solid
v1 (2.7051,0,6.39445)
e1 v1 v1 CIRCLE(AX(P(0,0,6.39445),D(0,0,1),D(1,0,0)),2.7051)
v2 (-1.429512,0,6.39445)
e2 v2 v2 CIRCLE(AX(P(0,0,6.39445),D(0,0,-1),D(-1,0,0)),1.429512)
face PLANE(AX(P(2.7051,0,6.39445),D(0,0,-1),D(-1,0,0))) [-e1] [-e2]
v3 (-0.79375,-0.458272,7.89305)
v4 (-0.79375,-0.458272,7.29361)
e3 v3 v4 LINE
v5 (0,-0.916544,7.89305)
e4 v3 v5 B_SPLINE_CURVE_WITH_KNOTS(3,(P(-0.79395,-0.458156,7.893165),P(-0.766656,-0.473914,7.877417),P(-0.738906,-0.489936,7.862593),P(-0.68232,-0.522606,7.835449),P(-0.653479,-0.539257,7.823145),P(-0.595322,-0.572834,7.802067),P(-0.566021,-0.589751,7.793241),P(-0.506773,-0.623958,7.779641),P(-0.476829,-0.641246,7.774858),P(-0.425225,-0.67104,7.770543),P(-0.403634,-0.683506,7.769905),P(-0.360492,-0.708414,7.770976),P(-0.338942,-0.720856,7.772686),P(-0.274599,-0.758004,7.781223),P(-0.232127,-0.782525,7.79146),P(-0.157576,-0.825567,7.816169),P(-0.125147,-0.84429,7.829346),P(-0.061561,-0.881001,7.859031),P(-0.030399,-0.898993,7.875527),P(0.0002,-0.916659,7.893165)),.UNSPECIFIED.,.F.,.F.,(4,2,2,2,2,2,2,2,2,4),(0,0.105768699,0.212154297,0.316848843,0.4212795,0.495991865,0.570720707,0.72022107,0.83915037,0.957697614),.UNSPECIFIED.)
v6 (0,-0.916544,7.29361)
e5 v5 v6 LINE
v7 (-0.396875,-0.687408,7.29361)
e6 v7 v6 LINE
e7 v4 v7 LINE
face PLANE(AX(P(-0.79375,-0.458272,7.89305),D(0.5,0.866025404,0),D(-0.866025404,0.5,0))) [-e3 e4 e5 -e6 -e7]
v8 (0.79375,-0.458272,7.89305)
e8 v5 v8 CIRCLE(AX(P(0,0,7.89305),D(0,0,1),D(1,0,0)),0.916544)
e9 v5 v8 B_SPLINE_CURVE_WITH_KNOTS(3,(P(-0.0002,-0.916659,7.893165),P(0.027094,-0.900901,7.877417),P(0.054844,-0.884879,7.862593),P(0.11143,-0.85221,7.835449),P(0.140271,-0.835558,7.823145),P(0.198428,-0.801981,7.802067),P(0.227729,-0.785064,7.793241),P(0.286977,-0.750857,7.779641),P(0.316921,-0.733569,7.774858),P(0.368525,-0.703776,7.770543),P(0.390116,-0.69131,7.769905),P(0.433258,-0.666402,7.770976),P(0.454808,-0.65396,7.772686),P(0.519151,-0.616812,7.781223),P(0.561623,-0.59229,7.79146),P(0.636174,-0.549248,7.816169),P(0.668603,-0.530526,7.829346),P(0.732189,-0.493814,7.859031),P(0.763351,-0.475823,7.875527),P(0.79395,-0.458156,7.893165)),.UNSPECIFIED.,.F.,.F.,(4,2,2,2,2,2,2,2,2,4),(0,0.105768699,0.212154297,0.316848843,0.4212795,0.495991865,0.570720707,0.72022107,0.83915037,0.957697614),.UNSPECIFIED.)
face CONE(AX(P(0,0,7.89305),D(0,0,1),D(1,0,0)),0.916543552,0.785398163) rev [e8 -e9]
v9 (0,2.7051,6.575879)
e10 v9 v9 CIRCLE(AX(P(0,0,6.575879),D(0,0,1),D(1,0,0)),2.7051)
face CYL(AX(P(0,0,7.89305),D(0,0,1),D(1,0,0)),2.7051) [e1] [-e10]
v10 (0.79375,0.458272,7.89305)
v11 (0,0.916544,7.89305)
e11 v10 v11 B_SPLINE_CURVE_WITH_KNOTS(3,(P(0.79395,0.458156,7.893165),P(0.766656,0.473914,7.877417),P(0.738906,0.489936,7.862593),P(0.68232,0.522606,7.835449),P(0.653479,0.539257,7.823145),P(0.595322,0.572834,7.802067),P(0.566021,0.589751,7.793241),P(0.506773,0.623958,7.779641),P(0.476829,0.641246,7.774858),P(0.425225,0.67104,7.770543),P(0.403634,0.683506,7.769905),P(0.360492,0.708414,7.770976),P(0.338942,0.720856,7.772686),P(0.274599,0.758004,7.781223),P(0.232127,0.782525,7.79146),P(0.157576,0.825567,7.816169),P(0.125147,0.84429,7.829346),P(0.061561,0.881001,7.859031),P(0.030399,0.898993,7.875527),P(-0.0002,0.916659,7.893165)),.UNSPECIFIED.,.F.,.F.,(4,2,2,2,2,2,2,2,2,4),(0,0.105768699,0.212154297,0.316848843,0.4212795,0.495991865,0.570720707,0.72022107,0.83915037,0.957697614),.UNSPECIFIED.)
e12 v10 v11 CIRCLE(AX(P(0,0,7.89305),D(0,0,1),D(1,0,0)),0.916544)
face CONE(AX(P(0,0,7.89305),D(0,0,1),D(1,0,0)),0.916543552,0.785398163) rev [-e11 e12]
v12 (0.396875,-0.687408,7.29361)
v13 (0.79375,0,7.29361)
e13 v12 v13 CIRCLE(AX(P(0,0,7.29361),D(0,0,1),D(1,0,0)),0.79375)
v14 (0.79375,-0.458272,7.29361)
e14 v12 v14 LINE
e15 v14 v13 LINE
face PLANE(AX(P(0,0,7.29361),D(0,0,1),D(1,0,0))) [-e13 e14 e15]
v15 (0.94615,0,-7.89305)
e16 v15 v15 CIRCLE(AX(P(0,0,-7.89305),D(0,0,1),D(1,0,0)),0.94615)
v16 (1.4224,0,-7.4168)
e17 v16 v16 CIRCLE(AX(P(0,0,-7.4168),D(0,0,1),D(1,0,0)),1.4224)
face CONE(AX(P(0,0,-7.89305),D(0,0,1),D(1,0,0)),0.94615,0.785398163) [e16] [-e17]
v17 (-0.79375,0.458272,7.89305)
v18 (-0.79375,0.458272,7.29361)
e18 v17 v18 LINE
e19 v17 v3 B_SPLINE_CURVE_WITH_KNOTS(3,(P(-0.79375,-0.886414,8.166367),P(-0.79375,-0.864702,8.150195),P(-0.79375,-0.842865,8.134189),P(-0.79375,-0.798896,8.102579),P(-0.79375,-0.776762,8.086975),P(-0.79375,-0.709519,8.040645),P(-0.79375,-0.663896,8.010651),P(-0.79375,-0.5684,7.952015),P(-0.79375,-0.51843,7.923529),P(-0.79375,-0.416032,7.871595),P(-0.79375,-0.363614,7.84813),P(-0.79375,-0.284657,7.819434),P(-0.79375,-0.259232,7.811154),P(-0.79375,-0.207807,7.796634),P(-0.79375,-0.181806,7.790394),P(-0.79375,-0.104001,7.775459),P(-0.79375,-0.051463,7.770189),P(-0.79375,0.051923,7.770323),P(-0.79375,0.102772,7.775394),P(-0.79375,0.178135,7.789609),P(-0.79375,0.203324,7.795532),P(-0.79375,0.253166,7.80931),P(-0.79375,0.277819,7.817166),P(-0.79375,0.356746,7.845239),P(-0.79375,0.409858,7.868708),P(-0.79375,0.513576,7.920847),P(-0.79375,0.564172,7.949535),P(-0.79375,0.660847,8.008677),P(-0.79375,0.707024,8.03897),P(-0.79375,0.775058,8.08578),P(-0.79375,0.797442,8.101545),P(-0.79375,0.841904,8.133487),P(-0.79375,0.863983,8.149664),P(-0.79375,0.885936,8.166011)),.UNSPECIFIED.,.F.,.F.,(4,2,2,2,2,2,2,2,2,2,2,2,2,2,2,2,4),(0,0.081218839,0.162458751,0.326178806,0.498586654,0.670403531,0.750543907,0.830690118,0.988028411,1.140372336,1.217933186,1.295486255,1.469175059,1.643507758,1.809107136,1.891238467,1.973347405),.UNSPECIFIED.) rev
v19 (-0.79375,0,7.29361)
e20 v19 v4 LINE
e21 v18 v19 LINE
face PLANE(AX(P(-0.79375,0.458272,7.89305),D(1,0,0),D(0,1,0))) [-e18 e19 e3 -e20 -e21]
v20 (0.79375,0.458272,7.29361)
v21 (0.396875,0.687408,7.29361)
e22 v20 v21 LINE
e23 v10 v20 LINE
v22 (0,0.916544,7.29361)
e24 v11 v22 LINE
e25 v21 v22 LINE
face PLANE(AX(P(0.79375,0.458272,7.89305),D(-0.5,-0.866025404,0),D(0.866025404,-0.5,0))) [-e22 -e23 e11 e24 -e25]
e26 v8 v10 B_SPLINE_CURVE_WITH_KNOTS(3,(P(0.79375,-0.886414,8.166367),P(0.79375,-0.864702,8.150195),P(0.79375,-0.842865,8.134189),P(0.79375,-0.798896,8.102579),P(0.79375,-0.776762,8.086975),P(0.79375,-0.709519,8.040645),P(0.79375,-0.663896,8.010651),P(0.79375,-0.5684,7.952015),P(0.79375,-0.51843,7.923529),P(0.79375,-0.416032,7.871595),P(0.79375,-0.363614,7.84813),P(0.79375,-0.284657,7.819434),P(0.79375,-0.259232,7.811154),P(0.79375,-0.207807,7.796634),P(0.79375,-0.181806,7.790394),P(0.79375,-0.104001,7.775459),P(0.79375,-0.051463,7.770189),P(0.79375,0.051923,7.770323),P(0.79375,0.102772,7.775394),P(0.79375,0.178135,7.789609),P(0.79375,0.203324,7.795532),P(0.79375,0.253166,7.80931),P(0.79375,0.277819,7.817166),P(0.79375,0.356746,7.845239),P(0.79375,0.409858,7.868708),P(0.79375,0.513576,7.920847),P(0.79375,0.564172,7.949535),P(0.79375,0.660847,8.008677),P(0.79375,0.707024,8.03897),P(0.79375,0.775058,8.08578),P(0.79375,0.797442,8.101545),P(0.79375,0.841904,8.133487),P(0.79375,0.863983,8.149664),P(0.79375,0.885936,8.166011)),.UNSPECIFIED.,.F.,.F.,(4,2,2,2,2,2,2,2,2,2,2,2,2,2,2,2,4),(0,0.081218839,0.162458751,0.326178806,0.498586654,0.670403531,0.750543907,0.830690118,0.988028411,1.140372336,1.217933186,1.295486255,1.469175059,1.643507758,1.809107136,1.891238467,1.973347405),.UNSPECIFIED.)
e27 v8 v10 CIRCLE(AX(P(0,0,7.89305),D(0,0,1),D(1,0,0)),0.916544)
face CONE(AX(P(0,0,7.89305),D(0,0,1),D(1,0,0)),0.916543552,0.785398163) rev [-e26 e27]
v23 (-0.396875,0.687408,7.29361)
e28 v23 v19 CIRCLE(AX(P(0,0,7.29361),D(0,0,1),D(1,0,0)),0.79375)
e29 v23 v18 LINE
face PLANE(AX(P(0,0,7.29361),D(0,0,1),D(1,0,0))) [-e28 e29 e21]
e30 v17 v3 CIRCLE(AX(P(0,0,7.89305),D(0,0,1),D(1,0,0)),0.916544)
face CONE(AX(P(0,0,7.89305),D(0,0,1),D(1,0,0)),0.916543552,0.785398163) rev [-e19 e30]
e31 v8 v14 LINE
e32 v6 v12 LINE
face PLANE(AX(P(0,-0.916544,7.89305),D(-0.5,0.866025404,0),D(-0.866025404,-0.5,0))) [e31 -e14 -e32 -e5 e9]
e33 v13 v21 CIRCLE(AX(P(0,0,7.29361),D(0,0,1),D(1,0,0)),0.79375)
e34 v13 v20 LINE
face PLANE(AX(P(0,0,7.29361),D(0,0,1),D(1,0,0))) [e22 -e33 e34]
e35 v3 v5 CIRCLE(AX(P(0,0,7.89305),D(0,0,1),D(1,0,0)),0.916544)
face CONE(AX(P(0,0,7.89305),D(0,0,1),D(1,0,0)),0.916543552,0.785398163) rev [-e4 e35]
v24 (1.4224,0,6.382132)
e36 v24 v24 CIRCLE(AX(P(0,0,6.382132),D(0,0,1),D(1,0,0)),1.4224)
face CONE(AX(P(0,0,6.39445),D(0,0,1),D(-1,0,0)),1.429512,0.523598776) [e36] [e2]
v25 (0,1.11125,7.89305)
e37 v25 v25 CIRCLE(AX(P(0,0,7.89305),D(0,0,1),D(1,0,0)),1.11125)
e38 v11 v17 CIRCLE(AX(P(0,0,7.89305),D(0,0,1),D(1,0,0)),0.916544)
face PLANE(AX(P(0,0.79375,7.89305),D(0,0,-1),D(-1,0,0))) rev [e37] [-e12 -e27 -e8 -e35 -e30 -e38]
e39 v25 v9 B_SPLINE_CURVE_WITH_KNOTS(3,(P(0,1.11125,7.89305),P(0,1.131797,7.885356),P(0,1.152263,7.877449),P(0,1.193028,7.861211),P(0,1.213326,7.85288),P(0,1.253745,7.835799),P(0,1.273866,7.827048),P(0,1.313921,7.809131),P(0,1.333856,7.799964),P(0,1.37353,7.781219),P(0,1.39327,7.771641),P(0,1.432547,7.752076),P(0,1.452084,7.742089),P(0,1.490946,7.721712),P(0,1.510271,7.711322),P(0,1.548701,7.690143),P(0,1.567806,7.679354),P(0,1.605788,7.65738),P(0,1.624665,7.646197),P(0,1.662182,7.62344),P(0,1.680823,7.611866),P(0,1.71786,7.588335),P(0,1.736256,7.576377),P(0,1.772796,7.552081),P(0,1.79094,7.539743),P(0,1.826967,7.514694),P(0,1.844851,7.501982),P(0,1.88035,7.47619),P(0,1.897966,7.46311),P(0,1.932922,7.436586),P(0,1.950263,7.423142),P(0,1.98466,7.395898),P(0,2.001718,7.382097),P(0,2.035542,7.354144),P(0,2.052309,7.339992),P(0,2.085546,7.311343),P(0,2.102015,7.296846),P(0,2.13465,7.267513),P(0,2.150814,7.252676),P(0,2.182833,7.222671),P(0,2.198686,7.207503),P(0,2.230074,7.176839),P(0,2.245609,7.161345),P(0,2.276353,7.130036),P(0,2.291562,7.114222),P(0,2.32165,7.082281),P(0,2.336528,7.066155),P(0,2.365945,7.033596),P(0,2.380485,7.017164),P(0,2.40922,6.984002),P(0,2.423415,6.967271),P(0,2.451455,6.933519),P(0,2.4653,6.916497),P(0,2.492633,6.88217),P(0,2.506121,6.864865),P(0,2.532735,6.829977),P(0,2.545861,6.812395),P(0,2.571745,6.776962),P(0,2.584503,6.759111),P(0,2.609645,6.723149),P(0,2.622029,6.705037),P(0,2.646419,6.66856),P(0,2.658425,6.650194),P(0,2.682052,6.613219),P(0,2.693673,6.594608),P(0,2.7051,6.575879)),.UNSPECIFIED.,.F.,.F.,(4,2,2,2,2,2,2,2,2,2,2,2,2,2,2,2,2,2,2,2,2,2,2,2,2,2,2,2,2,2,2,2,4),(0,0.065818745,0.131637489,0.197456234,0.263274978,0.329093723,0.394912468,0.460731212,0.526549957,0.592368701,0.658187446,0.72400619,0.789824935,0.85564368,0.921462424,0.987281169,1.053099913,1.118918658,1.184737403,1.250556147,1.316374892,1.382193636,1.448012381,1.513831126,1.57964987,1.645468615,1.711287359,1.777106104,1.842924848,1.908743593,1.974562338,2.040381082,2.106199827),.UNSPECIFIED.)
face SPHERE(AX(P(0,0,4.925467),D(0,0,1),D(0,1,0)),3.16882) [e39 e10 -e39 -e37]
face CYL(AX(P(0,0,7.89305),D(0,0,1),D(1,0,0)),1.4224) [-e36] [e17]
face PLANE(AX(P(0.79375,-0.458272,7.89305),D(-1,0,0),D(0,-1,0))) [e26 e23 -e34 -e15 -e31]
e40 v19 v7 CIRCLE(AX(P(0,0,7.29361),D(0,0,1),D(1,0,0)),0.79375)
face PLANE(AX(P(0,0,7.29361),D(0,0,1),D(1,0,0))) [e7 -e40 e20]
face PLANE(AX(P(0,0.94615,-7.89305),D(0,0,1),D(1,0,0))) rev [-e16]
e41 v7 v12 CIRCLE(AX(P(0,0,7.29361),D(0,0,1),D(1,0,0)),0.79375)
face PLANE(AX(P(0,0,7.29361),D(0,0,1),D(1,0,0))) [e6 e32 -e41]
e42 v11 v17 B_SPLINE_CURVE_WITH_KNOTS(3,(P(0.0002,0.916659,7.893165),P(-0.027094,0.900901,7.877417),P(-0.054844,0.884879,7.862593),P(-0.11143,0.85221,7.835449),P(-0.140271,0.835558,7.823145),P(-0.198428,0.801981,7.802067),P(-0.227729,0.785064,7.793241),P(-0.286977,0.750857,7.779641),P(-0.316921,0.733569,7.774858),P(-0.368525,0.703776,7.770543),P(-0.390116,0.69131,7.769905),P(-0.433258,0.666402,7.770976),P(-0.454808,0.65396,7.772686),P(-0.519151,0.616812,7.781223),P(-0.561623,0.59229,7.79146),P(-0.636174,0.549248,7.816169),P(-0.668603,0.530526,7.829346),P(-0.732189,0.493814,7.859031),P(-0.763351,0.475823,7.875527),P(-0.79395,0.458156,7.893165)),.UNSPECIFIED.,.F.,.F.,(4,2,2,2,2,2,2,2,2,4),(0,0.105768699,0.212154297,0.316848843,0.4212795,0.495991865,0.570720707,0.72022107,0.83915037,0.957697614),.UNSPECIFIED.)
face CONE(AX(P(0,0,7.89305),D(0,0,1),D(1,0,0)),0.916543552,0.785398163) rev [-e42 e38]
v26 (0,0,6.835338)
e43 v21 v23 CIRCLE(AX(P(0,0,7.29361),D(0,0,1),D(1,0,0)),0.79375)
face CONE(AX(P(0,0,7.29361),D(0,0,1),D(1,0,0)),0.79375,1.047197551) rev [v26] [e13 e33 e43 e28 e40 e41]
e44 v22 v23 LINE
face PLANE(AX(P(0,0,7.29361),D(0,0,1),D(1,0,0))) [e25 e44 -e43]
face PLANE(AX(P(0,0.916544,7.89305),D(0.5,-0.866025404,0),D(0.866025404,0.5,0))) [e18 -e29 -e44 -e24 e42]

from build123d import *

# Parameters (mm, degrees)
CUT_EXTRUDE1_START = 7.29361
CUT_EXTRUDE1_DEPTH = 2.477670997


# Read off the part's stored shape, not the designer's step: Split1
with BuildPart() as part:
    # Sketch2 → Revolve1 (revolve)
    with BuildSketch(Plane(origin=(0, 0, 0), x_dir=(0, 0, -1), z_dir=(1, 0, 0)), mode=Mode.PRIVATE) as revolve1_sk:
        with BuildLine():
            Line((-7.89305, 0.79375), (-7.89305, 1.11125))
            ThreePointArc((-7.89305, 1.11125), (-7.36812089, 2.018629974), (-6.575878571, 2.7051))
            Line((-6.575878571, 2.7051), (-6.39445, 2.7051))
            Line((-6.39445, 2.7051), (-6.39445, 1.4224))
            Line((-6.39445, 1.4224), (7.4168, 1.4224))
            Line((7.4168, 1.4224), (7.89305, 0.94615))
            Line((7.89305, 0.94615), (7.89305, 0))
            Line((7.89305, 0), (-6.835338224, 0))
            Line((-6.835338224, 0), (-7.29361, 0.79375))
            Line((-7.29361, 0.79375), (-7.89305, 0.79375))
        make_face()
    revolve(revolve1_sk.sketch.rotate(Axis((0, 0, 7.89305), (0, 0, -1)), 90), axis=Axis((0, 0, 7.89305), (0, 0, -1)))

    # Sketch3 → Cut-Extrude1 (cut, through all)
    with BuildSketch(Plane.XY.offset(CUT_EXTRUDE1_START)):
        Polygon((0, 0.916543552), (-0.79375, 0.458271776), (-0.79375, -0.458271776), (0, -0.916543552), (0.79375, -0.458271776), (0.79375, 0.458271776), align=None)
    extrude(amount=CUT_EXTRUDE1_DEPTH, mode=Mode.SUBTRACT)

    # Cut-Extrude2 cone 1 section (through the dimple's axis) → Cut-Extrude2 (revolve, cut)
    with BuildSketch(Plane(origin=(0, 0, 7.89305), x_dir=(0, -1, 0), z_dir=(1, 0, 0))):
        Polygon((0, 0), (0.916543552, 0), (0, 0.916543552), align=None)
    revolve(axis=Axis((0, 0, 7.89305), (0, 0, -1)), mode=Mode.SUBTRACT)


with BuildPart() as body_2:
    # Split1: the piece on the far side of the plane
    add(part.part)
    split(bisect_by=Plane.XY.offset(6.39445), keep=Keep.BOTTOM)


with BuildPart() as part_1:
    add(part.part)

    # Split1
    split(bisect_by=Plane.XY.offset(6.39445), keep=Keep.TOP)

    add(body_2.part)  # Boss-Extrude1 merges body 2
    # Boss-Extrude1 cone 1 section (through the dimple's axis) → Boss-Extrude1 (revolve)
    with BuildSketch(Plane(origin=(0, 0, 6.39445), x_dir=(0, -1, 0), z_dir=(1, 0, 0))):
        Polygon((0, 0), (1.429512, 0), (0, 2.475987414), align=None)
    revolve(axis=Axis((0, 0, 6.39445), (0, 0, -1)))


solid = part_1.part
